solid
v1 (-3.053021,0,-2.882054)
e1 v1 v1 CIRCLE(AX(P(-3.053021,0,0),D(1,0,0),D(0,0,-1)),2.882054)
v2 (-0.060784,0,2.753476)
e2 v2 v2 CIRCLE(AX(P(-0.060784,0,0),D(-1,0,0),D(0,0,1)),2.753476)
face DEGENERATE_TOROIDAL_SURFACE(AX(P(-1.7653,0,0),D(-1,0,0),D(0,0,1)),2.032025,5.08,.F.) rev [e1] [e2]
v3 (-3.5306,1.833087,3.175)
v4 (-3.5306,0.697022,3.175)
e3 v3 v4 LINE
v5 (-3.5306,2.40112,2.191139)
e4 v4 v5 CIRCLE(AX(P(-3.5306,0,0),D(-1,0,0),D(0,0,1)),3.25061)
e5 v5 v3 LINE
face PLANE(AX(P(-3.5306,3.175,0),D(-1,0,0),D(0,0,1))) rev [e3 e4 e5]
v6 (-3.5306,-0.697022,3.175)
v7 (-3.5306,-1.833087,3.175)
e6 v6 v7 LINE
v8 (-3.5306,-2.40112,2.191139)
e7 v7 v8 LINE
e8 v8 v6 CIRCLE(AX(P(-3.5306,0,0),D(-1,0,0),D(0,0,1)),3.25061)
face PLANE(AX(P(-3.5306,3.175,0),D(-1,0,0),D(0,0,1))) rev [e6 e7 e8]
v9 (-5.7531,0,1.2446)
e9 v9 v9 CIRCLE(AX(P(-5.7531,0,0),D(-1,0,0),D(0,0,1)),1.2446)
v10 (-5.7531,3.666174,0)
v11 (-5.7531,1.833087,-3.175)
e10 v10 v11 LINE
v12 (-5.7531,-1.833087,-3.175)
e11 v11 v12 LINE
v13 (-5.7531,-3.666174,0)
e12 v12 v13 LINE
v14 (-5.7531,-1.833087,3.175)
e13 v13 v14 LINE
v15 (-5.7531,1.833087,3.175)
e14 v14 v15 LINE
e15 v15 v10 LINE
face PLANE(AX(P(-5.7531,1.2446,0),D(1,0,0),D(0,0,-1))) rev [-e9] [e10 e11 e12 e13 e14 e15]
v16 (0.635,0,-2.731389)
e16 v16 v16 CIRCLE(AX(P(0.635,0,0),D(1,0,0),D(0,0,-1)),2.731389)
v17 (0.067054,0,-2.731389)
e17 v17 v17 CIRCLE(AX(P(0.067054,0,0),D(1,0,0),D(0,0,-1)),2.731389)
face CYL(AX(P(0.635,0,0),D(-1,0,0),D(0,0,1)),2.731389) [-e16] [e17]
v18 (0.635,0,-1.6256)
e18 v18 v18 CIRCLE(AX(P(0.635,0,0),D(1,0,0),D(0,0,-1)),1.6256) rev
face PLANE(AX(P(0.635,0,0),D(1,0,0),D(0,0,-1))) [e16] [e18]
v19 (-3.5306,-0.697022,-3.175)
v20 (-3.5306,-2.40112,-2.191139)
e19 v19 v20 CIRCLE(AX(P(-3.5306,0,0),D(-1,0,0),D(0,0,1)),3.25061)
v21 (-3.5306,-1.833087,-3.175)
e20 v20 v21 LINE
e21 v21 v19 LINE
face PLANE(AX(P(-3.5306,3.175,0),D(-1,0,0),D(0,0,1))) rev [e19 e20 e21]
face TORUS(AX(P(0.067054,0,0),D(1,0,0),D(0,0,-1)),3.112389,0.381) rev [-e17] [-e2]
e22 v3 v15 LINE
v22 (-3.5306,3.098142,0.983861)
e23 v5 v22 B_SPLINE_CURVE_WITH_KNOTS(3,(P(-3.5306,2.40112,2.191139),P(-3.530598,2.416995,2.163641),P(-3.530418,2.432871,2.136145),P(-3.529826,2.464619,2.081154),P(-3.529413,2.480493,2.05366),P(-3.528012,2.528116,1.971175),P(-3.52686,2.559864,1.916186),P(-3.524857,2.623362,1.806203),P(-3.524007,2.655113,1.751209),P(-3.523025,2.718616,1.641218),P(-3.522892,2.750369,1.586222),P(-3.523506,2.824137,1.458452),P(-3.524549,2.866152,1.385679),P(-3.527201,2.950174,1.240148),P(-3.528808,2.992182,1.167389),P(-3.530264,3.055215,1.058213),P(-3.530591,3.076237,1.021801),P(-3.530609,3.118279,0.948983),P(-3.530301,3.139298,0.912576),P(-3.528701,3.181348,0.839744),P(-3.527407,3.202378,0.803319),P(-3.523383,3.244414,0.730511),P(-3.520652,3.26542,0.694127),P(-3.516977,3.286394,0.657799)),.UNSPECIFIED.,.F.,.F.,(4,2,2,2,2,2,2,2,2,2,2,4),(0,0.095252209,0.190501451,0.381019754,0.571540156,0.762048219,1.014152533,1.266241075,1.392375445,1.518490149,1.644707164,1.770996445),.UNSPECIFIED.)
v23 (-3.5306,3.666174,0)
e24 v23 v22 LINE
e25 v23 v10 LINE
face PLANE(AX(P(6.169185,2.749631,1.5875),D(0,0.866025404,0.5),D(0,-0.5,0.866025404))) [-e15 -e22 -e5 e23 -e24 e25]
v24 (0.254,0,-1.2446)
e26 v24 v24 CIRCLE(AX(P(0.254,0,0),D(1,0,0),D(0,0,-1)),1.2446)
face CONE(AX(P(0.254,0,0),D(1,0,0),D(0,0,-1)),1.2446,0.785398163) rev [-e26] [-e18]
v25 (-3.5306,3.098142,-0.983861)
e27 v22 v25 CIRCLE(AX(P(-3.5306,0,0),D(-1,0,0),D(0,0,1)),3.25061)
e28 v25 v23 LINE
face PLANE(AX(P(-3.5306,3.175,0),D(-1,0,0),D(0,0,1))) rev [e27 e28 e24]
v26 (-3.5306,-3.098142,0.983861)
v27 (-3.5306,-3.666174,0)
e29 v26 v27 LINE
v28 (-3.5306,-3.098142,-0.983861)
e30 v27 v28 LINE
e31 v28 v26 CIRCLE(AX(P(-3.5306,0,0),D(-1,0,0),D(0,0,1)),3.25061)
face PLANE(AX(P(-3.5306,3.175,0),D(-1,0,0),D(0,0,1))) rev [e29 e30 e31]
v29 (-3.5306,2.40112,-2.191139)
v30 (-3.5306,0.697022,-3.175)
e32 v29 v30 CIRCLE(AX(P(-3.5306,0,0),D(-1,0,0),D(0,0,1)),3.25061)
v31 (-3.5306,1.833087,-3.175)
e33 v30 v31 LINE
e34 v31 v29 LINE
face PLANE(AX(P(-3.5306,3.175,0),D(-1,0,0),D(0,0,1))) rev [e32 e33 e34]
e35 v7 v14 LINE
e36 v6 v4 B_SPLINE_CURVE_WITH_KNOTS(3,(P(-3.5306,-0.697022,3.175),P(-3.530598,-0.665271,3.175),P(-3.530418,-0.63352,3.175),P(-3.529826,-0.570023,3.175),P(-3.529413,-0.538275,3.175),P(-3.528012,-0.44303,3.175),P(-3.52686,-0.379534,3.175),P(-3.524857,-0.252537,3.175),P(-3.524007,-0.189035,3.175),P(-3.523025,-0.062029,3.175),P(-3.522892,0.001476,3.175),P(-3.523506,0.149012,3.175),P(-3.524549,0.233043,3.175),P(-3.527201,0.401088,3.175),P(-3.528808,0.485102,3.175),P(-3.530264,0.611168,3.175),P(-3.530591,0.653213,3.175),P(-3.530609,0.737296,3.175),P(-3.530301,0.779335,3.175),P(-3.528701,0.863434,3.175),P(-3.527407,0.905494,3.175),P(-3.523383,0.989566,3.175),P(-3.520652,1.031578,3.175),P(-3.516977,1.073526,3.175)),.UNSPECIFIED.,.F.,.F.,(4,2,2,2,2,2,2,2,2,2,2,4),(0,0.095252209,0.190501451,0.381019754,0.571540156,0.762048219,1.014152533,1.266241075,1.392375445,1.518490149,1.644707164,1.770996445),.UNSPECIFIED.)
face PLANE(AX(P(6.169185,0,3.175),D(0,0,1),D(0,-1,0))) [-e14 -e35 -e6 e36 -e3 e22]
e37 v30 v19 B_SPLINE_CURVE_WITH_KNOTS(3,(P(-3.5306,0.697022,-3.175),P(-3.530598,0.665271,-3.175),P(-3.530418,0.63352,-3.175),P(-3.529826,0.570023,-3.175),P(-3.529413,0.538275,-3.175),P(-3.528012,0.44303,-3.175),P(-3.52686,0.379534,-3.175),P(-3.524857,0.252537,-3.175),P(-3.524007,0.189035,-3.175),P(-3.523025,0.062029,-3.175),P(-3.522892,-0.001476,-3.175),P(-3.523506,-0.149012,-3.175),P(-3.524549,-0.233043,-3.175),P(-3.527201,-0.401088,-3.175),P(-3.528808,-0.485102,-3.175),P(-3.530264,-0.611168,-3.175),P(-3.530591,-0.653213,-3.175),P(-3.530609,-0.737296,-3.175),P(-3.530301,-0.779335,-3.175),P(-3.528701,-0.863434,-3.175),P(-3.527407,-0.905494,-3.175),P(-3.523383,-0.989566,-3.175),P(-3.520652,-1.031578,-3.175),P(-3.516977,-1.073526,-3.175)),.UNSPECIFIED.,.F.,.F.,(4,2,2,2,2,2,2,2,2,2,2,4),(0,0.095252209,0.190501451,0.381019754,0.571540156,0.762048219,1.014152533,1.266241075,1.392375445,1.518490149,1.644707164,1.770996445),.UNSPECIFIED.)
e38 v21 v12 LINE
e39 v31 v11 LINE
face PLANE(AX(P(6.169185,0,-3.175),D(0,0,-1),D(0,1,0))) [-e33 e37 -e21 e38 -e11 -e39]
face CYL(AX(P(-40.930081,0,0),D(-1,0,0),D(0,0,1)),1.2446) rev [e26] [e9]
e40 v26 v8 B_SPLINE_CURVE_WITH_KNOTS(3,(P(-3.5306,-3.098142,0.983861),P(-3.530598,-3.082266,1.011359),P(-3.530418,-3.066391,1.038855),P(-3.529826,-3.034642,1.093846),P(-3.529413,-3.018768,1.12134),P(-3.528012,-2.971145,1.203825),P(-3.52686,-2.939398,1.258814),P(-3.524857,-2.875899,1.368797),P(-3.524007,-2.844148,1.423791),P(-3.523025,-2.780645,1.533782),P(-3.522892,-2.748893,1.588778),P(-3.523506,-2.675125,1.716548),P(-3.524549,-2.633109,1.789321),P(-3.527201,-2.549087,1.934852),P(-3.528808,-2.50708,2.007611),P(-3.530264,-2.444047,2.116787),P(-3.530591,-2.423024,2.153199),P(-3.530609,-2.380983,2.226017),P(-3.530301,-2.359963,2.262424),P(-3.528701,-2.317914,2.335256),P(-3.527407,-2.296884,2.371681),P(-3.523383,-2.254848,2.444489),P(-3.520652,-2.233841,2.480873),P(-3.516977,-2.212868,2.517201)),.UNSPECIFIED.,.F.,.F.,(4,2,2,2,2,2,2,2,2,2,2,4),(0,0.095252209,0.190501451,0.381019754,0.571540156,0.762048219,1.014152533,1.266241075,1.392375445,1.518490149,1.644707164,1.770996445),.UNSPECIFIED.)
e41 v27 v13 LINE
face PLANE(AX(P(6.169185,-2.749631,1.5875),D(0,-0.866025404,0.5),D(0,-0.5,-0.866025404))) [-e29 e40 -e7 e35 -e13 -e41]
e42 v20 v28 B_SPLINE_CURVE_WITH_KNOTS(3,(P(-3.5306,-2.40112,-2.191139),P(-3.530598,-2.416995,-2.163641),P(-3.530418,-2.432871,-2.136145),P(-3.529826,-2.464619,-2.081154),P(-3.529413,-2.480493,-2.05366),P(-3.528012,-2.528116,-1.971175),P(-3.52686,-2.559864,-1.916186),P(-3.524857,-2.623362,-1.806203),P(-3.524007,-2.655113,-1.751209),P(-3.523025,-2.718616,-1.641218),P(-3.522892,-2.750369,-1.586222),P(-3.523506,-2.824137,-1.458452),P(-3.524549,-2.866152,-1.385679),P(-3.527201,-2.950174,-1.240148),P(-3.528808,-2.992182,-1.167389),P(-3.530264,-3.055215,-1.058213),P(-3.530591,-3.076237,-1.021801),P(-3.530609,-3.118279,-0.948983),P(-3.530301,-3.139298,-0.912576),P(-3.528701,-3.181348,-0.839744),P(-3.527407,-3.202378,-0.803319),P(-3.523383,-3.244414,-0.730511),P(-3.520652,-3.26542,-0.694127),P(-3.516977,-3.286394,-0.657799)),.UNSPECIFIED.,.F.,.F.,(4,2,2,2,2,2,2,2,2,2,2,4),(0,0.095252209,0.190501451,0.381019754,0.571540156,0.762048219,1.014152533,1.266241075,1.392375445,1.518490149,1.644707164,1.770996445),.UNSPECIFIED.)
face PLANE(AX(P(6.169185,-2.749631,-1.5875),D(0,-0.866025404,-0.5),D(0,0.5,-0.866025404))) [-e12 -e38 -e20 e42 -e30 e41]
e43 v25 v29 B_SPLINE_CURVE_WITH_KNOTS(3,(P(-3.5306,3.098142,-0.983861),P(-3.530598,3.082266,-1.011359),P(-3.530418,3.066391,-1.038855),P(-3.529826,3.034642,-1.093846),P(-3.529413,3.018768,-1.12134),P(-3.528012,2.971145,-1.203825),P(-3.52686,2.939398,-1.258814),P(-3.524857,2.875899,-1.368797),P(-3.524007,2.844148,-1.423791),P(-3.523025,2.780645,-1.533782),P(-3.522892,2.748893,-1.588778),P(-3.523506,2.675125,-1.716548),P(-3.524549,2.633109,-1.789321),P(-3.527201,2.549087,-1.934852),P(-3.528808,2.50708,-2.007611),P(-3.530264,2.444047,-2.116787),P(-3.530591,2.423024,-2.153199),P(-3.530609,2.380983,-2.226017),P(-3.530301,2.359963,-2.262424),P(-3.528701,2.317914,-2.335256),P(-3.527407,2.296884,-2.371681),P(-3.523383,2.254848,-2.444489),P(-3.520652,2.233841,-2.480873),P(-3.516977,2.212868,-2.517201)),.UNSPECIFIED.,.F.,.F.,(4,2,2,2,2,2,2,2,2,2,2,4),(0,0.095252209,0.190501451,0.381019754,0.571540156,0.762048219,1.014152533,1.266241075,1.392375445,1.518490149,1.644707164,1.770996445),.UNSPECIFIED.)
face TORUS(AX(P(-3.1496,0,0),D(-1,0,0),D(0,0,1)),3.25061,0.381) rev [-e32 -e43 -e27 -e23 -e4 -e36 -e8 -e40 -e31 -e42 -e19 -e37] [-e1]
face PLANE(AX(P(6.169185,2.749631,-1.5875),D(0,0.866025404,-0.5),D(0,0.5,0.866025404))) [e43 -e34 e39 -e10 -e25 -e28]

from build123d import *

# Parameters (mm, degrees)
BOSS_EXTRUDE1_START = -2.2225
SKETCH2_R           = 3.175
SKETCH2_R_2         = 1.2446
BOSS_EXTRUDE1_DEPTH = 2.2225
SKETCH3_R           = 2.731389
SKETCH3_R_2         = 1.2446
BOSS_EXTRUDE2_DEPTH = 0.635
FILLET1_R           = 0.381
FILLET2_R           = 0.381
CHAMFER1_SIZE       = 0.381


with BuildPart() as part:
    # Sketch1 → Revolve1 (revolve)
    with BuildSketch(Plane.XY, mode=Mode.PRIVATE) as revolve1_sk:
        with BuildLine():
            Line((0, 2.731389), (0, 1.2446))
            Line((0, 1.2446), (-5.7531, 1.2446))
            Line((-5.7531, 1.2446), (-5.7531, 3.175))
            Line((-5.7531, 3.175), (-3.5306, 3.175))
            Line((-3.5306, 3.175), (-3.5306, 2.731389))
            ThreePointArc((-3.5306, 2.731389), (-1.7653, 3.047974688), (0, 2.731389))
        make_face()
    revolve(revolve1_sk.sketch.rotate(Axis((-40.930080617, 0, 0), (1, 0, 0)), 90), axis=Axis((-40.930080617, 0, 0), (1, 0, 0)))

    # Sketch2 → Boss-Extrude1 (add)
    # profile 1 of 7: a face of its own
    with BuildSketch(Plane.ZY.offset(5.7531).offset(BOSS_EXTRUDE1_START)):
        with BuildLine():
            Line((1.587499954, 2.749630684), (0, 3.666174209))
            Line((0, 3.666174209), (-1.587500022, 2.749630644))
            ThreePointArc((-1.587500022, 2.749630644), (-3.9e-08, 3.175), (1.587499954, 2.749630684))
        make_face()
    # profile 2 of 7: a face of its own
    with BuildSketch(Plane.ZY.offset(5.7531).offset(BOSS_EXTRUDE1_START)):
        with BuildLine():
            ThreePointArc((-3.175, 0), (-2.749630663, 1.587499989), (-1.587500022, 2.749630644))
            Line((-1.587500022, 2.749630644), (-3.175, 1.833087105))
            Line((-3.175, 1.833087105), (-3.175, 0))
        make_face()
    # profile 3 of 7: a face of its own
    with BuildSketch(Plane.ZY.offset(5.7531).offset(BOSS_EXTRUDE1_START)):
        with BuildLine():
            ThreePointArc((-1.587499933, -2.749630696), (-2.749630638, -1.587500034), (-3.175, 0))
            Line((-3.175, 0), (-3.175, -1.833087105))
            Line((-3.175, -1.833087105), (-1.587499933, -2.749630696))
        make_face()
    # profile 4 of 7: a face of its own
    with BuildSketch(Plane.ZY.offset(5.7531).offset(BOSS_EXTRUDE1_START)):
        with BuildLine():
            ThreePointArc((1.587499954, -2.749630684), (1.2e-08, -3.175), (-1.587499933, -2.749630696))
            Line((-1.587499933, -2.749630696), (0, -3.666174209))
            Line((0, -3.666174209), (1.587499954, -2.749630684))
        make_face()
    # profile 5 of 7: a face of its own
    with BuildSketch(Plane.ZY.offset(5.7531).offset(BOSS_EXTRUDE1_START)):
        with BuildLine():
            Line((3.175, -1.833087105), (3.175, 0))
            ThreePointArc((3.175, 0), (2.749630644, -1.587500023), (1.587499954, -2.749630684))
            Line((1.587499954, -2.749630684), (3.175, -1.833087105))
        make_face()
    # profile 6 of 7: a face of its own
    with BuildSketch(Plane.ZY.offset(5.7531).offset(BOSS_EXTRUDE1_START)):
        with BuildLine():
            Line((3.175, 1.833087105), (1.587499954, 2.749630684))
            ThreePointArc((1.587499954, 2.749630684), (2.749630644, 1.587500023), (3.175, 0))
            Line((3.175, 0), (3.175, 1.833087105))
        make_face()
    # profile 7 of 7: a face of its own
    with BuildSketch(Plane.ZY.offset(5.7531).offset(BOSS_EXTRUDE1_START)):
        Circle(SKETCH2_R)
        Circle(SKETCH2_R_2, mode=Mode.SUBTRACT)
    extrude(amount=BOSS_EXTRUDE1_DEPTH)

    # Sketch3 → Boss-Extrude2 (add)
    with BuildSketch(Plane(origin=(0, 0, 0), x_dir=(0, 0, -1), z_dir=(1, 0, 0))):
        Circle(SKETCH3_R)
        with Locations(Location((0, 0, 0), (0, 0, 180))):
            Circle(SKETCH3_R_2, mode=Mode.SUBTRACT)
    extrude(amount=BOSS_EXTRUDE2_DEPTH)

    # Fillet1
    # the kernel refuses this fillet: 0.381 mm, written as the material it adds along each edge
    with BuildSketch(Plane(origin=(-3.5306, 0, 0), x_dir=(0, 0, 1), z_dir=(0, 1, 0))) as fillet1_piece_1_section:
        with BuildLine():
            CenterArc((3.250609874, 0.381), FILLET1_R, 165.315967452, 104.684032548)
            Line((3.250609874, 0), (2.731389, 0))
            ThreePointArc((2.731389, 0), (2.81260995, 0.236931857), (2.882053931, 0.47757907))
        make_face()
    fillet1_piece_1 = revolve(axis=Axis((-3.5306, 0, 0), (1, 0, 0)), mode=Mode.PRIVATE)
    fillet1_piece_1 = split(fillet1_piece_1, bisect_by=Plane(origin=(-3.388898911, -4.022914712, -0.617892675), z_dir=(0, 0.8660254037844387, -0.49999999999999994)), keep=Keep.TOP, mode=Mode.PRIVATE)
    fillet1_piece_1 = split(fillet1_piece_1, bisect_by=Plane(origin=(-3.388898911, -1.476346602, -3.792892675), z_dir=(0, 0.8660254037844389, 0.4999999999999997)), keep=Keep.TOP, mode=Mode.PRIVATE)
    fillet1_piece_1 = split(fillet1_piece_1, bisect_by=Plane(origin=(-3.388898911, 0, -3.175), z_dir=(0, 0, 1)), keep=Keep.TOP, mode=Mode.PRIVATE)
    fillet1_piece_1 = split(fillet1_piece_1, bisect_by=Plane(origin=(-3.388898911, 1.476346602, -3.792892675), z_dir=(0, -0.8660254037844386, 0.5000000000000001)), keep=Keep.TOP, mode=Mode.PRIVATE)
    fillet1_piece_1 = split(fillet1_piece_1, bisect_by=Plane(origin=(-3.388898911, 4.022914712, -0.617892675), z_dir=(0, -0.8660254037844387, -0.49999999999999983)), keep=Keep.TOP, mode=Mode.PRIVATE)
    fillet1_piece_1 = split(fillet1_piece_1, bisect_by=Plane(origin=(-3.388898911, 0, 3.175), z_dir=(0, 0, -1)), keep=Keep.TOP, mode=Mode.PRIVATE)
    add(fillet1_piece_1)

    # Fillet2
    fillet2_edges = [part.edges().sort_by_distance(p)[0] for p in [
        (0, -2.731389, 0),
    ]]
    fillet(fillet2_edges, radius=FILLET2_R)

    # Chamfer1
    chamfer1_edges = [part.edges().sort_by_distance(p)[0] for p in [
        (0.635, 0, -1.2446),
    ]]
    chamfer(chamfer1_edges, length=CHAMFER1_SIZE)


solid = part.part
